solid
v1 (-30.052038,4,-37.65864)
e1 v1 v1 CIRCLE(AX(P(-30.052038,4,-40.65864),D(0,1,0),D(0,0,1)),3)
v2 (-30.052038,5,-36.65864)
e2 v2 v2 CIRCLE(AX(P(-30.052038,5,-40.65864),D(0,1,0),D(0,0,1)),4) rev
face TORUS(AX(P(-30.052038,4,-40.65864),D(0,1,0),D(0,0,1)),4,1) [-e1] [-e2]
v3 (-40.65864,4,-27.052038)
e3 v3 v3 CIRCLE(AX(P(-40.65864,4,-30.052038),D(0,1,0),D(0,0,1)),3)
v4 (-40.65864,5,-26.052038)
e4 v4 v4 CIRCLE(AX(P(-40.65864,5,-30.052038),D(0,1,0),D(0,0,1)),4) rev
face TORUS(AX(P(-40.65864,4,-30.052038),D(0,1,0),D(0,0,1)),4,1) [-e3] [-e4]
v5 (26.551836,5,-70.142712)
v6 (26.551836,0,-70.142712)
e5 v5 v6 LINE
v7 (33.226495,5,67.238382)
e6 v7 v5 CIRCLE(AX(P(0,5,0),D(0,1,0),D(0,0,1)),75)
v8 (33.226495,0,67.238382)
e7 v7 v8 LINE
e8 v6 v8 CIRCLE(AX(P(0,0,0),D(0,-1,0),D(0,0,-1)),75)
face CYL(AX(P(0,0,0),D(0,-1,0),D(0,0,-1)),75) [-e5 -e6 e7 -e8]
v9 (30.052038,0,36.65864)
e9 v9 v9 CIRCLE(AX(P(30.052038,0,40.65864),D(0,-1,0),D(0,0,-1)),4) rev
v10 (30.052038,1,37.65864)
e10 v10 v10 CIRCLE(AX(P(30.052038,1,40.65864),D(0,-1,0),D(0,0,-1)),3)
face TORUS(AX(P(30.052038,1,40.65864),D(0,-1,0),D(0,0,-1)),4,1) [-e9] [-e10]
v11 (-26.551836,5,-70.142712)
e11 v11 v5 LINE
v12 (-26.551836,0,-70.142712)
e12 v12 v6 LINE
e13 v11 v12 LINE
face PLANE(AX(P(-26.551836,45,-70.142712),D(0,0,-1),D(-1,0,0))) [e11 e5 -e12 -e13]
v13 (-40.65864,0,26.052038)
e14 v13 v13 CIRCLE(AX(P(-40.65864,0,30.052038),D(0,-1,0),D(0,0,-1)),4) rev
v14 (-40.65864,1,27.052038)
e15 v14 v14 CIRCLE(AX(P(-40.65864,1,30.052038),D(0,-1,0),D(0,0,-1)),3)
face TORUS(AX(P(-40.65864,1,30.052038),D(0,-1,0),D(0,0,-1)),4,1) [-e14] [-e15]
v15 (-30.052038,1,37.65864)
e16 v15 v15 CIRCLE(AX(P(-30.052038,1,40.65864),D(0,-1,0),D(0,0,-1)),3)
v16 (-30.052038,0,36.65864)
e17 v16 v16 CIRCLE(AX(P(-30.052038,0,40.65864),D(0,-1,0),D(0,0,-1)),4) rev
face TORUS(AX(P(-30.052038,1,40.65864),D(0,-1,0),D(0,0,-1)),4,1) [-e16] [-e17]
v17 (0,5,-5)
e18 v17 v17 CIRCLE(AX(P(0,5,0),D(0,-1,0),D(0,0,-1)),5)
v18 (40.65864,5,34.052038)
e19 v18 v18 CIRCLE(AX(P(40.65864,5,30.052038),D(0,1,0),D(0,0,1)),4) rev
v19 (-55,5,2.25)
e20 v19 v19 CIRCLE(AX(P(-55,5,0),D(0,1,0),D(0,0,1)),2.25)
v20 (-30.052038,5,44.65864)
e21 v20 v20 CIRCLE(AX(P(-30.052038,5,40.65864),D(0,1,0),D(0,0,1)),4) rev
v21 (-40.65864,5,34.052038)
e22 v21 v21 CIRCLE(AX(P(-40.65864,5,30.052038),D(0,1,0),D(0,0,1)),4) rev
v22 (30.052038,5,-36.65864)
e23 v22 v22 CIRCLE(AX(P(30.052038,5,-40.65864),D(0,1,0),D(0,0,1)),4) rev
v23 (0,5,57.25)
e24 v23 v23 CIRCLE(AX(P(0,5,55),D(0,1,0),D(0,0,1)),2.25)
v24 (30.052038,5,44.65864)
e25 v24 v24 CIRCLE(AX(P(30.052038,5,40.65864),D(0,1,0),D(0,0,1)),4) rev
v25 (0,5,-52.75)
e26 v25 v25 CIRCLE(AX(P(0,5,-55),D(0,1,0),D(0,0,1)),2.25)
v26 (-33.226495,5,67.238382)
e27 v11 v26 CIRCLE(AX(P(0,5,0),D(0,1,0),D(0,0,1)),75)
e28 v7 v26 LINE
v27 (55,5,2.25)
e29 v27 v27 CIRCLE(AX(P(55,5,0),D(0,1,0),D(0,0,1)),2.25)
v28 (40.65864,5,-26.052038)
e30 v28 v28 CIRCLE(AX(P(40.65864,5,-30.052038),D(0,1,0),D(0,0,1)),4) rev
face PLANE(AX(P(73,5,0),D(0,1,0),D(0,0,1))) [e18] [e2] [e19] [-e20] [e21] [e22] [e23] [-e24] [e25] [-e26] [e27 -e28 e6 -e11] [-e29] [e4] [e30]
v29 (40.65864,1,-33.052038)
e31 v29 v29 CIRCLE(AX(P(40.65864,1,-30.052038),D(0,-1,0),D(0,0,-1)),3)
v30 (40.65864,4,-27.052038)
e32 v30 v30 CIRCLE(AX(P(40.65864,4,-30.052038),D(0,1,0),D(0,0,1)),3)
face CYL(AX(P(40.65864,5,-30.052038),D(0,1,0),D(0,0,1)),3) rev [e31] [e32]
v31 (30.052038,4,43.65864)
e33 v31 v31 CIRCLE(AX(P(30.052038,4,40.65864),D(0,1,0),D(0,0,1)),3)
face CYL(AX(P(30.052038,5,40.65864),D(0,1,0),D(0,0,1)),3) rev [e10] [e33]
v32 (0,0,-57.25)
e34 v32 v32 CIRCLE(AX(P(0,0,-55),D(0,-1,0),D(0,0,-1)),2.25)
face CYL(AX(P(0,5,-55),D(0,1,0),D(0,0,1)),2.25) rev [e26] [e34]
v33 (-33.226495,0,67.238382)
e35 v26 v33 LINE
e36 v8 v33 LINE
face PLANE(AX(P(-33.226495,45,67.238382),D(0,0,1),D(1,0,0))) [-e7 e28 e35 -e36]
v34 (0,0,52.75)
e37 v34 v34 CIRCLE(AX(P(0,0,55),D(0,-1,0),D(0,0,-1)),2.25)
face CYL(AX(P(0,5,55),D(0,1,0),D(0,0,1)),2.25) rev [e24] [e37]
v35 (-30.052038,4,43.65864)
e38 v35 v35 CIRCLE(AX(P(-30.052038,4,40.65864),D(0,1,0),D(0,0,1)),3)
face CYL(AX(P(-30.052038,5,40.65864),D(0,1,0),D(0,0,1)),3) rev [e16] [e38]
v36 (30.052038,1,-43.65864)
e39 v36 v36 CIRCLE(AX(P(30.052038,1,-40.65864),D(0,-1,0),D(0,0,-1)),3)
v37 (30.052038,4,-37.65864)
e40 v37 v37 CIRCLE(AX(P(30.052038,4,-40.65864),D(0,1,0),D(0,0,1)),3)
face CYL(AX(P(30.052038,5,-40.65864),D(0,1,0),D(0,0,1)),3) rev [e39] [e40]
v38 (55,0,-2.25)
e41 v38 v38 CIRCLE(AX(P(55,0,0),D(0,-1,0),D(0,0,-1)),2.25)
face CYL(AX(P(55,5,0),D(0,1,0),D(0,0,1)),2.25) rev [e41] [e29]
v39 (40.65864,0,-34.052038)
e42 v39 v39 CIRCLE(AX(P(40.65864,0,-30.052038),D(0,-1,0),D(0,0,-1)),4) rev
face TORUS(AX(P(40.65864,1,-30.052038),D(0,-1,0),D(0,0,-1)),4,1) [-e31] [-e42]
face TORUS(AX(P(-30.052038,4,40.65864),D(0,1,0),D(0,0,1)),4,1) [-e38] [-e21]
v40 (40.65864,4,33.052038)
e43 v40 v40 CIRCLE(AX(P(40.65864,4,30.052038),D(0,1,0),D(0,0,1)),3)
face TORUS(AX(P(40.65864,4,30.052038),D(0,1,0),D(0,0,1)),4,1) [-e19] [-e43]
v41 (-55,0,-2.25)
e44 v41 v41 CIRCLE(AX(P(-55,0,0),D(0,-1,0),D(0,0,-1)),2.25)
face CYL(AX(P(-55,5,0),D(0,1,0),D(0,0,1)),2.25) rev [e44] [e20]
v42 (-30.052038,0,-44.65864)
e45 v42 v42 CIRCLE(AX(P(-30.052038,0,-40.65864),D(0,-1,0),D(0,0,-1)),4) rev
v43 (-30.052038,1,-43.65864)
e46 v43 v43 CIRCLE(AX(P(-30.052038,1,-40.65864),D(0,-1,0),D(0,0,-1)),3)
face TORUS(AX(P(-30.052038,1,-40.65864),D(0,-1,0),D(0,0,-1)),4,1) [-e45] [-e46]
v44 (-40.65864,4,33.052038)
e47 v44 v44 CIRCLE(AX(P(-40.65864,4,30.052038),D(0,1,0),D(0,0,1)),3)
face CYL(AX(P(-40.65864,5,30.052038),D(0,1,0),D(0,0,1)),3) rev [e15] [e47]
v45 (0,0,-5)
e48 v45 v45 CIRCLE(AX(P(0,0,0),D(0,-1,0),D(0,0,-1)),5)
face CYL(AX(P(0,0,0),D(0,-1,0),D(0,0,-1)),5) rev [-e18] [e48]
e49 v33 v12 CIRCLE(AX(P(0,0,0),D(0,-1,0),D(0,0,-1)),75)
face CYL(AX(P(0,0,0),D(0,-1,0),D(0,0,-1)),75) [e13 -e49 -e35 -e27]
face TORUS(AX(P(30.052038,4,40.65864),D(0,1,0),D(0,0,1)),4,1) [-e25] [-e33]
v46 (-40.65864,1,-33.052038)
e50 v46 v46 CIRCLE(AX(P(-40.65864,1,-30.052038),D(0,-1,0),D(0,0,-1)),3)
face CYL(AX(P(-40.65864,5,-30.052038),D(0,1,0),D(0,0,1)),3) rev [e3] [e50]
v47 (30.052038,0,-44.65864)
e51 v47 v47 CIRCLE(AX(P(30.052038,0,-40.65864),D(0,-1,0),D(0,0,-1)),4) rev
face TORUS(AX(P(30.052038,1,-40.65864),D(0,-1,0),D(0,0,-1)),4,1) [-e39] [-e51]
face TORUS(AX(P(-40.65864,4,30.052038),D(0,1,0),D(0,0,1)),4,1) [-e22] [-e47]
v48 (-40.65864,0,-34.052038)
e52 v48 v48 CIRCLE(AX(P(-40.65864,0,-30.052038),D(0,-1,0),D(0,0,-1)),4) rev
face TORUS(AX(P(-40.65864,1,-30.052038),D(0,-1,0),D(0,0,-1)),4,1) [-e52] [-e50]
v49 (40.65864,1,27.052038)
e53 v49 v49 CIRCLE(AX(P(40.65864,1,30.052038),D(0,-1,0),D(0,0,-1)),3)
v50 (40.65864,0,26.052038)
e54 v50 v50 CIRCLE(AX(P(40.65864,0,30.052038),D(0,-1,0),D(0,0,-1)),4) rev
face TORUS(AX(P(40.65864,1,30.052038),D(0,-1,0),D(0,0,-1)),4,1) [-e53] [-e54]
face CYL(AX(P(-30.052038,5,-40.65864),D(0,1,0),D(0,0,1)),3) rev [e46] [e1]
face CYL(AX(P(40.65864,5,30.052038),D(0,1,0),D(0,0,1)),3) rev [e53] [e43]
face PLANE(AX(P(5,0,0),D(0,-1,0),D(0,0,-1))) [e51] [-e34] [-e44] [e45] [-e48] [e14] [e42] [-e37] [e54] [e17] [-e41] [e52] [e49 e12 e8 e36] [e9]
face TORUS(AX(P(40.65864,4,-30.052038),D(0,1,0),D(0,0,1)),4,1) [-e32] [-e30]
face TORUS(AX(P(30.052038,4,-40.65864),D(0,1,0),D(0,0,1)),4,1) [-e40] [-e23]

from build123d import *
from OCP.BRepFilletAPI import BRepFilletAPI_MakeChamfer

# Parameters (mm, degrees)
BOSS_EXTRUDE10_DEPTH             = 38
CUT_EXTRUDE7_DEPTH               = 114.357840488
CUT_EXTRUDE7_DEPTH_BACK          = 114.357840488
CUT_EXTRUDE8_REACH               = 164.861
SKETCH44_W                       = 5
SKETCH44_H                       = 3
BOSS_EXTRUDE11_DEPTH             = 13
CHAMFER11_SIZE                   = 3
CHAMFER11_SIZE_2                 = 13
F_2_0_START                      = 25.919230669
F_2_0_2_DIAMETER_HOLE1_OUTLINE_R = 1
F_2_0_2_DIAMETER_HOLE1_DEPTH     = 4.730769331
M4_CLEARANCE_HOLE1_D             = 4.5
F_6_0_6_DIAMETER_HOLE1_D         = 6
FILLET33_R                       = 1
F_3_0_3_DIAMETER_HOLE2_D         = 3
F_3_0_3_DIAMETER_HOLE2_DEPTH     = 2.238381896
SKETCH53_R                       = 75
CUT_EXTRUDE9_DEPTH               = 111.204355799


# Read off the part's stored shape, not the designer's step: Ø2.0 (2) Diameter Hole1
with BuildPart() as part:
    # Sketch34 → Revolve1 (revolve)
    with BuildSketch(Plane.XY, mode=Mode.PRIVATE) as revolve1_sk:
        Polygon((5, 0), (75, 0), (75, 45), (73, 43), (73, 5), (5, 5), align=None)
    revolve(revolve1_sk.sketch.rotate(Axis((0, 0, 0), (0, 1, 0)), 90), axis=Axis((0, 0, 0), (0, 1, 0)))

    # Sketch35 → Boss-Extrude10 (add)
    with BuildSketch(Plane(origin=(0, 5, 0), x_dir=(1, 0, 0), z_dir=(0, 1, 0))):
        with BuildLine():
            Line((-26.551836095, 68), (26.551836095, 68))
            ThreePointArc((26.551836095, 68), (0, 73), (-26.551836095, 68))
        make_face()
        with BuildLine():
            Line((33.226495452, -65), (-33.226495452, -65))
            ThreePointArc((-33.226495452, -65), (0, -73), (33.226495452, -65))
        make_face()
    extrude(amount=BOSS_EXTRUDE10_DEPTH)

    # Sketch36 → Cut-Extrude7 (cut, two sides: drawn at the far end of the back side and taken through both)
    with BuildSketch(Plane(origin=(0, 5, 0), x_dir=(1, 0, 0), z_dir=(0, 1, 0)).offset(-CUT_EXTRUDE7_DEPTH_BACK)):
        with BuildLine():
            Line((-26.551836095, 70.142711667), (26.551836095, 70.142711667))
            ThreePointArc((26.551836095, 70.142711667), (0, 75), (-26.551836095, 70.142711667))
        make_face()
        with BuildLine():
            Line((-33.226495452, -67.238381896), (33.226495452, -67.238381896))
            ThreePointArc((33.226495452, -67.238381896), (0, -75), (-33.226495452, -67.238381896))
        make_face()
    extrude(amount=CUT_EXTRUDE7_DEPTH + CUT_EXTRUDE7_DEPTH_BACK, mode=Mode.SUBTRACT)

    # Sketch43 → Cut-Extrude8 (cut, up to next)
    with BuildSketch(Plane.XY.offset(67.238381896), mode=Mode.PRIVATE) as cut_extrude8_sk1:
        with BuildLine():
            Line((-33.226495452, 29), (33.226495452, 29))
            Line((33.226495452, 29), (33.226495452, 36.795504442))
            ThreePointArc((33.226495452, 36.795504442), (33.791441286, 39.104247508), (35.35861327, 40.891264663))
            Line((35.35861327, 40.891264663), (39.935107214, 44.095760221))
            ThreePointArc((39.935107214, 44.095760221), (41.299460399, 44.768584754), (42.802989396, 45))
            Line((42.802989396, 45), (-42.802989396, 45))
            ThreePointArc((-42.802989396, 45), (-41.299460399, 44.768584754), (-39.935107214, 44.095760221))
            Line((-39.935107214, 44.095760221), (-35.35861327, 40.891264663))
            ThreePointArc((-35.35861327, 40.891264663), (-33.791441286, 39.104247508), (-33.226495452, 36.795504442))
            Line((-33.226495452, 36.795504442), (-33.226495452, 29))
        make_face()
    cut_extrude8_tool1 = extrude(cut_extrude8_sk1.sketch, amount=-CUT_EXTRUDE8_REACH, mode=Mode.PRIVATE) & part.part
    add(cut_extrude8_tool1.solids().sort_by_distance((0, 37.254898, 67.238382))[0], mode=Mode.SUBTRACT)

    # Sketch44 → Boss-Extrude11 (add)
    with BuildSketch(Plane.XY.offset(-68)):
        with Locations((-19.45, 29.15)):
            Rectangle(SKETCH44_W, SKETCH44_H)
        with Locations((8.55, 29.15)):
            Rectangle(SKETCH44_W, SKETCH44_H)
    extrude(amount=BOSS_EXTRUDE11_DEPTH)

    # Chamfer11
    chamfer11_edges_1 = [part.edges().sort_by_distance(p)[0] for p in [
        (8.55, 27.65, -68),
    ]]
    chamfer11_side_1 = [part.faces().sort_by_distance(p)[0] for p in [
        (8.55, 27.59, -68),
    ]]
    chamfer11_edges_2 = [part.edges().sort_by_distance(p)[0] for p in [
        (-19.45, 27.65, -68),
    ]]
    chamfer11_side_2 = [part.faces().sort_by_distance(p)[0] for p in [
        (-19.45, 27.59, -68),
    ]]
    chamfer11 = BRepFilletAPI_MakeChamfer(part.part.solid().wrapped)
    for e in chamfer11_edges_1:
        chamfer11.Add(CHAMFER11_SIZE - 0.0001, CHAMFER11_SIZE_2 - 0.0001, e.wrapped, chamfer11_side_1[0].wrapped)
    for e in chamfer11_edges_2:
        chamfer11.Add(CHAMFER11_SIZE - 0.0001, CHAMFER11_SIZE_2 - 0.0001, e.wrapped, chamfer11_side_2[0].wrapped)
    add(Compound.cast(chamfer11.Shape()), mode=Mode.REPLACE)  # a hair under: the kernel refuses the full size

    # Ø2.0 (2) Diameter Hole1 outline → Ø2.0 (2) Diameter Hole1 (cut)
    with BuildSketch(Plane(origin=(0, 0, 0), x_dir=(1, 0, 0), z_dir=(0, 1, 0)).offset(F_2_0_START)):
        with Locations((8.55, 61.5)):
            Circle(F_2_0_2_DIAMETER_HOLE1_OUTLINE_R)
        with Locations((-19.45, 61.5)):
            Circle(F_2_0_2_DIAMETER_HOLE1_OUTLINE_R)
    extrude(amount=F_2_0_2_DIAMETER_HOLE1_DEPTH, mode=Mode.SUBTRACT)

    # M4 Clearance Hole1 (through all)
    with Locations(Plane(origin=(0, 5, 0), x_dir=(1, 0, 0), z_dir=(0, 1, 0))):
        with Locations((-55, 0), (55, 0), (0, 55), (0, -55)):
            Hole(M4_CLEARANCE_HOLE1_D / 2)

    # Ø6.0 (6) Diameter Hole1 (through all)
    with Locations(Plane(origin=(0, 5, 0), x_dir=(1, 0, 0), z_dir=(0, 1, 0))):
        with Locations((30.0520382, 40.658639918), (40.658639918, 30.0520382), (40.658639918, -30.0520382), (30.0520382, -40.658639918), (-30.0520382, -40.658639918), (-40.658639918, -30.0520382), (-40.658639918, 30.0520382), (-30.0520382, 40.658639918)):
            Hole(F_6_0_6_DIAMETER_HOLE1_D / 2)

    # Fillet33
    fillet33_edges = [part.edges().sort_by_distance(p)[0] for p in [
        (-27.0520382, 5, -40.658639918),
        (-27.0520382, 0, -40.658639918),
        (-37.658639918, 5, -30.0520382),
        (-37.658639918, 0, -30.0520382),
        (-37.658639918, 5, 30.0520382),
        (-37.658639918, 0, 30.0520382),
        (-27.0520382, 5, 40.658639918),
        (-27.0520382, 0, 40.658639918),
        (33.0520382, 5, 40.658639918),
        (33.0520382, 0, 40.658639918),
        (43.658639918, 5, 30.0520382),
        (43.658639918, 0, 30.0520382),
        (43.658639918, 5, -30.0520382),
        (43.658639918, 0, -30.0520382),
        (33.0520382, 5, -40.658639918),
        (33.0520382, 0, -40.658639918),
    ]]
    fillet(fillet33_edges, radius=FILLET33_R)

    # Ø3.0 (3) Diameter Hole2
    with Locations(Plane.XY.offset(67.238381896)):
        with Locations((0, 22), (-15, 8), (15, 8)):
            Hole(F_3_0_3_DIAMETER_HOLE2_D / 2, depth=F_3_0_3_DIAMETER_HOLE2_DEPTH)

    # Sketch53 → Cut-Extrude9 (cut, through all)
    with BuildSketch(Plane(origin=(0, 5, 0), x_dir=(1, 0, 0), z_dir=(0, 1, 0))):
        Circle(SKETCH53_R)
    extrude(amount=CUT_EXTRUDE9_DEPTH, mode=Mode.SUBTRACT)


solid = part.part
